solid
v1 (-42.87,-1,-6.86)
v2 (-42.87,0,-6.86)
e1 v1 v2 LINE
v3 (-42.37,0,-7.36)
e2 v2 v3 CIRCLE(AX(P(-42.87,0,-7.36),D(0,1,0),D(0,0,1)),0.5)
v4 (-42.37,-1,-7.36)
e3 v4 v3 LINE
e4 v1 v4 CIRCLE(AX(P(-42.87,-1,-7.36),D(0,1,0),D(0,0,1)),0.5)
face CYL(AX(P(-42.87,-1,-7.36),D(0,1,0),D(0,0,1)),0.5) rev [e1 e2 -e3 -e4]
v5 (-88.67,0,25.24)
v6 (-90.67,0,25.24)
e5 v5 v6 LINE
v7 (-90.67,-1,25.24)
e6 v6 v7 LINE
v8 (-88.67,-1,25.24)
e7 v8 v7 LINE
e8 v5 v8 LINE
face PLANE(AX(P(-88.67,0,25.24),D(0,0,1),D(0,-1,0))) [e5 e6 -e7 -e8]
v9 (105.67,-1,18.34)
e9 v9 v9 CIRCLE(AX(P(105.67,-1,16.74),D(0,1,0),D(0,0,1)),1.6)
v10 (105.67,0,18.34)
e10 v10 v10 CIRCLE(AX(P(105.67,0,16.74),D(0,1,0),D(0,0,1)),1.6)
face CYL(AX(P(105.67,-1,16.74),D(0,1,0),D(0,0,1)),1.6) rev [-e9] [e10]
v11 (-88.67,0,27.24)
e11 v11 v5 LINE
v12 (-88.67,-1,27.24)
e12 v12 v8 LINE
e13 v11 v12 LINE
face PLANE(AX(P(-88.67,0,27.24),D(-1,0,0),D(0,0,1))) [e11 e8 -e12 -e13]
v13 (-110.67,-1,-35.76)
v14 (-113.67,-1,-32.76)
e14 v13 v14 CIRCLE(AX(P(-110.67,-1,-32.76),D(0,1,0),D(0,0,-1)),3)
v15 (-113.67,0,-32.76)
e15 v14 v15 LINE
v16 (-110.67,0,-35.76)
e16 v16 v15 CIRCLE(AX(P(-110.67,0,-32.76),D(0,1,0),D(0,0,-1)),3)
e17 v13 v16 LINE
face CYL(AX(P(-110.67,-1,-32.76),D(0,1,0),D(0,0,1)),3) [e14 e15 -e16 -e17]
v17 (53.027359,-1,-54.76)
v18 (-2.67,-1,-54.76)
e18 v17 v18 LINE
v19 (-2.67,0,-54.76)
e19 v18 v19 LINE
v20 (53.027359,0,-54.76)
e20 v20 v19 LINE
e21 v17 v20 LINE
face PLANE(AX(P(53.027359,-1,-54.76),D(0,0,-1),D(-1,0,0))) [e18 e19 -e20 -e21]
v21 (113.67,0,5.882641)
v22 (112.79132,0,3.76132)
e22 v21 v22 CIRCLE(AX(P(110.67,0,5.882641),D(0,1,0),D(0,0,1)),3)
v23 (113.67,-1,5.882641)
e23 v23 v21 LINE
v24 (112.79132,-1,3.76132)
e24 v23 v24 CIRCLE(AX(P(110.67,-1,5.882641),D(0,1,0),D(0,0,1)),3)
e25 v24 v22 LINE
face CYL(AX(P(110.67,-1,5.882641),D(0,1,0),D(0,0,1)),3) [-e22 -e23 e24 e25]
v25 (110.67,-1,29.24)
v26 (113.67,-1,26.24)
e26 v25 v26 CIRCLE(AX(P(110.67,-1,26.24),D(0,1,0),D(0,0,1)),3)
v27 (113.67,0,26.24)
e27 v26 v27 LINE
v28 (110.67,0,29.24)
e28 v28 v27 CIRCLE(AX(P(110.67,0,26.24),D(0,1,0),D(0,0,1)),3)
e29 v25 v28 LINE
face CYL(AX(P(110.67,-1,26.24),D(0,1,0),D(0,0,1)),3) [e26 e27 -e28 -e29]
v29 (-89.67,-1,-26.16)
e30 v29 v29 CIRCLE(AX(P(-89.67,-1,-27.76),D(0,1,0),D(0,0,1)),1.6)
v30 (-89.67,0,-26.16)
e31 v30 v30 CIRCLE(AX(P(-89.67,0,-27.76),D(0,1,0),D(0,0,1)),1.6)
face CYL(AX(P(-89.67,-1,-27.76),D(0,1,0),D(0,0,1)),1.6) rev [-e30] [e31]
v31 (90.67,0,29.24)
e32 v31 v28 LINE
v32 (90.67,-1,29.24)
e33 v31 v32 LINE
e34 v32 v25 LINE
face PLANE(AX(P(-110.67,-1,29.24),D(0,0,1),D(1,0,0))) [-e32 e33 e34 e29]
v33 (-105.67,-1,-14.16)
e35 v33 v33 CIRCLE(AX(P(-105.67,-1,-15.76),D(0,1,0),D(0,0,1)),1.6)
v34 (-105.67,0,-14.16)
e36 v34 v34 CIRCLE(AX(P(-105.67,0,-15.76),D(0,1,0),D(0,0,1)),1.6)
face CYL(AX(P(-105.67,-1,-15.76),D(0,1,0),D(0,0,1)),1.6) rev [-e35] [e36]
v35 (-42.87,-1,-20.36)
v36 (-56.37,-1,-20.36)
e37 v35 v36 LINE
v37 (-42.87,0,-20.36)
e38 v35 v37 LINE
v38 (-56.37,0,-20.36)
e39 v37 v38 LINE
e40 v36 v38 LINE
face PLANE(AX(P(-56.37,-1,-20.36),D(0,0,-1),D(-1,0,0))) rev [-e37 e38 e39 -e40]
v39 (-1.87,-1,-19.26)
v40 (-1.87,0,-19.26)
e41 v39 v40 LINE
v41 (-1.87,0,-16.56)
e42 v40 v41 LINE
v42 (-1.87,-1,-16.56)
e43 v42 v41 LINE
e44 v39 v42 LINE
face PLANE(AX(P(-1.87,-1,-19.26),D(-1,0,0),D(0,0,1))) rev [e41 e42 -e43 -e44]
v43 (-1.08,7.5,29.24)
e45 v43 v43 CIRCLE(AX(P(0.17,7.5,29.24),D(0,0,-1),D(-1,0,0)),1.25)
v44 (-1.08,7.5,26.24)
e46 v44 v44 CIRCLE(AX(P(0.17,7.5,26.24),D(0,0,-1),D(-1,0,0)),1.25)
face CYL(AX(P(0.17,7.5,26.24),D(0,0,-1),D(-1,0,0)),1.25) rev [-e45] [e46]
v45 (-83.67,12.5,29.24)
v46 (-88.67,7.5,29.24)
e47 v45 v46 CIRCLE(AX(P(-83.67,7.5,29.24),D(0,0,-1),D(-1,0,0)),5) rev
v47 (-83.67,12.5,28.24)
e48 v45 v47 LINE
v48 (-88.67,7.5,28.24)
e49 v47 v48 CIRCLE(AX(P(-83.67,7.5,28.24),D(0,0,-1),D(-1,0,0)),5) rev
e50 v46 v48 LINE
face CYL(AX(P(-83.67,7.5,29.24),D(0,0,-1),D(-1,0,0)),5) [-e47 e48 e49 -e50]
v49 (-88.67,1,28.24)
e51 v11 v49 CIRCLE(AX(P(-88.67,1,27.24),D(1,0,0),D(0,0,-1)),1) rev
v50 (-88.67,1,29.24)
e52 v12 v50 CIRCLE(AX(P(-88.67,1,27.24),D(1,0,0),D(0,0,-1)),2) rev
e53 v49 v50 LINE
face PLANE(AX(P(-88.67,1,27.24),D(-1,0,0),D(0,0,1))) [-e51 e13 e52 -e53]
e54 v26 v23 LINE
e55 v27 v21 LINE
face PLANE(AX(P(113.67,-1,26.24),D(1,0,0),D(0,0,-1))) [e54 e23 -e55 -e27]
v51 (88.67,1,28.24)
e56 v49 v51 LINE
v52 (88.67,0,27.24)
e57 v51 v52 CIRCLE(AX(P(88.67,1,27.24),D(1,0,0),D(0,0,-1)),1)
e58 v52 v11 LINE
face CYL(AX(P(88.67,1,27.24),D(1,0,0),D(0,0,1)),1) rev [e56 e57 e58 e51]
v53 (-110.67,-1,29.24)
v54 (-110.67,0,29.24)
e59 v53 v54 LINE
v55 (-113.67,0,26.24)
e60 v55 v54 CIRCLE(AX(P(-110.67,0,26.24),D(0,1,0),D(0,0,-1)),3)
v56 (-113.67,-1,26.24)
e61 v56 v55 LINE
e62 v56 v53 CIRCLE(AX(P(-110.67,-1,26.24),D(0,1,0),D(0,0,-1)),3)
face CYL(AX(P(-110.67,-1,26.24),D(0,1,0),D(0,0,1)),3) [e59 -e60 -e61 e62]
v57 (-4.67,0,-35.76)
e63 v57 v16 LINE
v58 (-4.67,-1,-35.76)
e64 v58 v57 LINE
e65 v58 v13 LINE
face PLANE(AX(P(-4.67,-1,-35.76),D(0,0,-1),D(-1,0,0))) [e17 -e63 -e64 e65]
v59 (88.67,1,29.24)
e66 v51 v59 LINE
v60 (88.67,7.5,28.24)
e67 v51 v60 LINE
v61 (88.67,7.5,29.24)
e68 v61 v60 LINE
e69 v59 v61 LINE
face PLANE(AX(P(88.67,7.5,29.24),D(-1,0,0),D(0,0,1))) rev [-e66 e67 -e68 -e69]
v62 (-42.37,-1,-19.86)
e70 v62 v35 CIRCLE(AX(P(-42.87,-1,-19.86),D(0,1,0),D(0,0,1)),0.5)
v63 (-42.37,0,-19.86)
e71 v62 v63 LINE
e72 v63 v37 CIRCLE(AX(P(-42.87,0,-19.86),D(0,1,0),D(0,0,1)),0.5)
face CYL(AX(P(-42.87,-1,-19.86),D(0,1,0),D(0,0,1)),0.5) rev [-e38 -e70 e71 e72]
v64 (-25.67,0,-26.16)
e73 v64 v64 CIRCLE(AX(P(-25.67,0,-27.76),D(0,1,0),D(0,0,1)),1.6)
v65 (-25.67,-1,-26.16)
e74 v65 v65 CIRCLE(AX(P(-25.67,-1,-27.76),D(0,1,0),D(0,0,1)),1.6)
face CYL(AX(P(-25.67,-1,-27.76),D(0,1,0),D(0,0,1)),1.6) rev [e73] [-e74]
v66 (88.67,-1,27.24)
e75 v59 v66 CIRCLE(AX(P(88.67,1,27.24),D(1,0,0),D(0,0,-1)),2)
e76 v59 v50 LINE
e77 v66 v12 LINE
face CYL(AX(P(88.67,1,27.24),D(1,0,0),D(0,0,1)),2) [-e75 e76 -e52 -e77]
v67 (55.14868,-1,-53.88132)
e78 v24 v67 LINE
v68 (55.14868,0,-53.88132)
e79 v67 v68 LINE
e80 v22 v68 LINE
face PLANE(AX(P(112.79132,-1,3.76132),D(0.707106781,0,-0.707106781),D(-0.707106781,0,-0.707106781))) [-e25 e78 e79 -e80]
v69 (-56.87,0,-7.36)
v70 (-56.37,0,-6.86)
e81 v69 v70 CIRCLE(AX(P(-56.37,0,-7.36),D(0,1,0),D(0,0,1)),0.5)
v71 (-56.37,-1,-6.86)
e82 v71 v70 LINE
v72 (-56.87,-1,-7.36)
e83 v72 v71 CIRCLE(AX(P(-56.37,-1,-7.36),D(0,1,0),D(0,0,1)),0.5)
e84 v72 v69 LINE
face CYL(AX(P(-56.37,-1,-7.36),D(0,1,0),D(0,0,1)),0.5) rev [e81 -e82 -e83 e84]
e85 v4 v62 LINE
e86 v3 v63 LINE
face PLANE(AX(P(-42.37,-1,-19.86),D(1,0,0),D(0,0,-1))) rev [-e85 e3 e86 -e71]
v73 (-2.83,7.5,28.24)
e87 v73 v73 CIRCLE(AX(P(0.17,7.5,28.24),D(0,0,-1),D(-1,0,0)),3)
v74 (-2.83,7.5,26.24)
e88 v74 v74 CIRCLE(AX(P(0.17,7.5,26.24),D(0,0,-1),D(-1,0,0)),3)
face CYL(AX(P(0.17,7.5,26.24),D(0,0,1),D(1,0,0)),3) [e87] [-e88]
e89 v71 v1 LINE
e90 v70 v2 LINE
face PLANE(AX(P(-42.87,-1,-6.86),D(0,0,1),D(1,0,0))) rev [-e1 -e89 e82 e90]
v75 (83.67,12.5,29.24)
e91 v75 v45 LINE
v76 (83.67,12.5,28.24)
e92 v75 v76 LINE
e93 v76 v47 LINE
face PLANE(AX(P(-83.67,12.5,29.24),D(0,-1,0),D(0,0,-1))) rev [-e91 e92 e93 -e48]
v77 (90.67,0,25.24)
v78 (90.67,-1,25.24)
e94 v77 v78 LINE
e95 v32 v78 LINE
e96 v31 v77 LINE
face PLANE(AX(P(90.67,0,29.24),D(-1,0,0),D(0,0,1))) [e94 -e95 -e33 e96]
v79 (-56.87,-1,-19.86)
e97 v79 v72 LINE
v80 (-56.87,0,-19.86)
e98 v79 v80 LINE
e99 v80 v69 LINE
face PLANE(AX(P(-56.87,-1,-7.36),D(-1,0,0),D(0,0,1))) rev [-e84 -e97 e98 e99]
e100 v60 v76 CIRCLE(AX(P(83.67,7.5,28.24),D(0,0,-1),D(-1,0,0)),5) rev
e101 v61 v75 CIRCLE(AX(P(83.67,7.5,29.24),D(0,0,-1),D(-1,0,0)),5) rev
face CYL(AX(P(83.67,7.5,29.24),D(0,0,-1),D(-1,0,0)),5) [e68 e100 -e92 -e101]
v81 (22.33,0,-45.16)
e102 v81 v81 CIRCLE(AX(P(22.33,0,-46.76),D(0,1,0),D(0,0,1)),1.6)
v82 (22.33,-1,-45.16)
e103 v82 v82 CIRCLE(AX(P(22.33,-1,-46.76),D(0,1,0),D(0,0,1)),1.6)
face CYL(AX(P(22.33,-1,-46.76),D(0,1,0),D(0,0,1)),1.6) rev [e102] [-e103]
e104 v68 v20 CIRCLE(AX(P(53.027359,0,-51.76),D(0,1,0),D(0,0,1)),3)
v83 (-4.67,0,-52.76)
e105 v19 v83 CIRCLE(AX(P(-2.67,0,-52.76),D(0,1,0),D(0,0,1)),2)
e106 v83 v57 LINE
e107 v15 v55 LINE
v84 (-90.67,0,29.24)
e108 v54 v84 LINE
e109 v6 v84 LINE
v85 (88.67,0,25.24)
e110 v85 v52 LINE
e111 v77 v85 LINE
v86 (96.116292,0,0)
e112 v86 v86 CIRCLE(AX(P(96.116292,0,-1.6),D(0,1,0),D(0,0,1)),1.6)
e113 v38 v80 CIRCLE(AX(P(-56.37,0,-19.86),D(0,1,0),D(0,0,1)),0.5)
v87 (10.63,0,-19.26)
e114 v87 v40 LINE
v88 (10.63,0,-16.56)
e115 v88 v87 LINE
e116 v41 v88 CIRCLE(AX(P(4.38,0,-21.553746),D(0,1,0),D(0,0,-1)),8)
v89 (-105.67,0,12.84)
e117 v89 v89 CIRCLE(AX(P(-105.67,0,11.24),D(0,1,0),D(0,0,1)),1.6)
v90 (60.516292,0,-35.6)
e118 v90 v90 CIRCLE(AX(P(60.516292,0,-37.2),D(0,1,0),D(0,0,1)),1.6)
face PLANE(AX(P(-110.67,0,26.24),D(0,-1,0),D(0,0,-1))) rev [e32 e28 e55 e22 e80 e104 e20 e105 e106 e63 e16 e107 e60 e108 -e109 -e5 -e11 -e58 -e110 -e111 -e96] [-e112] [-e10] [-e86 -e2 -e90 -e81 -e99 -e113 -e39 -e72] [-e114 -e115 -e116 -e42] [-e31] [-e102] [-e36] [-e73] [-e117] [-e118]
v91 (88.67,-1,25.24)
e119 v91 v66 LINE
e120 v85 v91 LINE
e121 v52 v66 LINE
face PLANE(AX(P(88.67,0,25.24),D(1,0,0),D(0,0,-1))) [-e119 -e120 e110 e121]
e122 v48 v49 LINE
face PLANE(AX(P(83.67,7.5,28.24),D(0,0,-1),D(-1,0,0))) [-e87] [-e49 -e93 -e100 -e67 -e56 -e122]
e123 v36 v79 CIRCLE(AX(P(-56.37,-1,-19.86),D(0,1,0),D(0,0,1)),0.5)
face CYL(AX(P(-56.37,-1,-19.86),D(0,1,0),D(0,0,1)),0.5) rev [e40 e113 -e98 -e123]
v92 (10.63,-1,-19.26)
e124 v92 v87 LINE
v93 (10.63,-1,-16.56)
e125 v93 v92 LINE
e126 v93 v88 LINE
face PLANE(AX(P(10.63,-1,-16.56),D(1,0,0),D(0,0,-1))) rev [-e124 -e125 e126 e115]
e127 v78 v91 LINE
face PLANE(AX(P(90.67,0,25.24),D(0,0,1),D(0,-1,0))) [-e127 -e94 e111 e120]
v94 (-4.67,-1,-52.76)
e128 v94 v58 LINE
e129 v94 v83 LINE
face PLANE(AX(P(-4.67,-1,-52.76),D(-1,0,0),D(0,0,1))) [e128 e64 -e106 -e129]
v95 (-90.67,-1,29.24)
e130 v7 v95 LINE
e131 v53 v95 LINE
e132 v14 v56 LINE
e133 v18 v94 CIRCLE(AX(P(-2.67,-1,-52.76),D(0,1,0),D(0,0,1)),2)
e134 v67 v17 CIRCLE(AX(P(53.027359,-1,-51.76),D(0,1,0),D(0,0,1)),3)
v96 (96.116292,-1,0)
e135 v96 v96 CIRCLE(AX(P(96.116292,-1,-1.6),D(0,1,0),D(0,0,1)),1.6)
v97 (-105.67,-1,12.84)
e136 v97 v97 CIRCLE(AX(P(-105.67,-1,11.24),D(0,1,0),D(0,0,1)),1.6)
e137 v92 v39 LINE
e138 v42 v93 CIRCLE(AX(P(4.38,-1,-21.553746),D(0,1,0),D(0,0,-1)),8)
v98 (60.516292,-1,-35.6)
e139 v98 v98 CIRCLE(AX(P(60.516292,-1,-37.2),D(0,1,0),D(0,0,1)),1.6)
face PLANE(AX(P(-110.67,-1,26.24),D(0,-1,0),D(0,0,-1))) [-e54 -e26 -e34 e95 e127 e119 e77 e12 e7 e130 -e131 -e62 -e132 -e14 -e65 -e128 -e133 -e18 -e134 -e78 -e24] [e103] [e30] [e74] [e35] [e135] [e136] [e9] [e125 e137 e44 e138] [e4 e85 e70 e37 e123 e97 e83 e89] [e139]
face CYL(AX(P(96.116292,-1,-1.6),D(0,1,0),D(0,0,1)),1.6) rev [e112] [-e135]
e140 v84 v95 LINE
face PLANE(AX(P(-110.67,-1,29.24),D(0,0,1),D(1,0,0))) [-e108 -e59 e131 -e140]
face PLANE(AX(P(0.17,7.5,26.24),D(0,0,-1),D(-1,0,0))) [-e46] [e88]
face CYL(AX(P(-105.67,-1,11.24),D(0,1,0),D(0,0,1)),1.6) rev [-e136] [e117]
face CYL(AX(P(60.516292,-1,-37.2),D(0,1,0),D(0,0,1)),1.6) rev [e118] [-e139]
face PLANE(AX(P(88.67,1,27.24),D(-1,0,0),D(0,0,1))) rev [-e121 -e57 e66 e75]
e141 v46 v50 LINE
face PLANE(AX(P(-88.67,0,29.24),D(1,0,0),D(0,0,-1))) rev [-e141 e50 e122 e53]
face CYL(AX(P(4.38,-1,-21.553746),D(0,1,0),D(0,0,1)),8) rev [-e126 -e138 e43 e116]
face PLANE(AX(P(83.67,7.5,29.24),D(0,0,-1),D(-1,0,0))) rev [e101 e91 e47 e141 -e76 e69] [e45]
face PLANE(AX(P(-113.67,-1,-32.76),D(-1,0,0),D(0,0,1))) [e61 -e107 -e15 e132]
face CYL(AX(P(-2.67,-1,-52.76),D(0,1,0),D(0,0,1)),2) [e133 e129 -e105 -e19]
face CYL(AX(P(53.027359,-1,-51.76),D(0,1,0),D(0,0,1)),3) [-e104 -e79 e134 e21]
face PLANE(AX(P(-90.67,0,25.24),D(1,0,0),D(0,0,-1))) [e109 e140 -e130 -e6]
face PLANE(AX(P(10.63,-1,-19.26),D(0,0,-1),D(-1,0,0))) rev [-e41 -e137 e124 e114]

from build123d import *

# Parameters (mm, degrees)
SKETCH_1_R                        = 1.6
SM_BASE_FLANGE_1_DEPTH            = 1
SM_EDGE_FLANGE_1_STRIP_W          = 6
SM_EDGE_FLANGE_1_STRIP_H          = 1
SM_EDGE_FLANGE_1_STRIP_CUT_DEPTH  = 177.34
SM_EDGE_FLANGE_1_RELIEF_W         = 8
SM_EDGE_FLANGE_1_RELIEF_H         = 2
SM_EDGE_FLANGE_1_RELIEF_CUT_DEPTH = 1
SM_EDGE_FLANGE_1_DEPTH            = 177.34
SM_EDGE_FLANGE_1_FLAT_DEPTH       = 1
SKETCH_5_R                        = 3
EXTRUDE_1_DEPTH                   = 2
HOLE_WIZARD_M3_1_D                = 2.5


# Sheet-metal steps are written as plain solids
with BuildPart() as part:
    # Sketch 1 → 基体-法兰1 (new body)
    with BuildSketch(Plane(origin=(0, 0, 0), x_dir=(1, 0, 0), z_dir=(0, 1, 0))):
        with BuildLine():
            Line((-113.67, 32.76), (-113.67, -26.24))
            ThreePointArc((-113.67, -26.24), (-112.791320344, -28.361320344), (-110.67, -29.24))
            Line((-110.67, -29.24), (110.67, -29.24))
            ThreePointArc((110.67, -29.24), (112.791320344, -28.361320344), (113.67, -26.24))
            Line((113.67, -26.24), (113.67, -5.882640687))
            ThreePointArc((113.67, -5.882640687), (113.441638598, -4.73459039), (112.791320344, -3.761320344))
            Line((112.791320344, -3.761320344), (55.148679656, 53.881320344))
            ThreePointArc((55.148679656, 53.881320344), (54.17540961, 54.531638598), (53.027359313, 54.76))
            Line((53.027359313, 54.76), (-2.67, 54.76))
            ThreePointArc((-2.67, 54.76), (-4.084213562, 54.174213562), (-4.67, 52.76))
            Line((-4.67, 52.76), (-4.67, 35.76))
            Line((-4.67, 35.76), (-110.67, 35.76))
            ThreePointArc((-110.67, 35.76), (-112.791320344, 34.881320344), (-113.67, 32.76))
        make_face()
        with Locations(Location((-105.67, -11.24, 0), (0, 0, 270))):
            Circle(SKETCH_1_R, mode=Mode.SUBTRACT)
        with Locations(Location((-105.67, 15.76, 0), (0, 0, 270))):
            Circle(SKETCH_1_R, mode=Mode.SUBTRACT)
        with Locations(Location((-89.67, 27.76, 0), (0, 0, 270))):
            Circle(SKETCH_1_R, mode=Mode.SUBTRACT)
        with Locations(Location((-25.67, 27.76, 0), (0, 0, 270))):
            Circle(SKETCH_1_R, mode=Mode.SUBTRACT)
        with Locations(Location((22.33, 46.76, 0), (0, 0, 270))):
            Circle(SKETCH_1_R, mode=Mode.SUBTRACT)
        with Locations(Location((60.516291501, 37.2, 0), (0, 0, 270))):
            Circle(SKETCH_1_R, mode=Mode.SUBTRACT)
        with Locations(Location((96.116291501, 1.6, 0), (0, 0, 270))):
            Circle(SKETCH_1_R, mode=Mode.SUBTRACT)
        with Locations(Location((105.67, -16.74, 0), (0, 0, 270))):
            Circle(SKETCH_1_R, mode=Mode.SUBTRACT)
        with BuildLine():
            Line((10.63, 19.26), (-1.87, 19.26))
            Line((-1.87, 19.26), (-1.87, 16.56))
            ThreePointArc((-1.87, 16.56), (4.38, 13.553746089), (10.63, 16.56))
            Line((10.63, 16.56), (10.63, 19.26))
        make_face(mode=Mode.SUBTRACT)
        with BuildLine():
            Line((-42.37, 19.86), (-42.37, 7.36))
            ThreePointArc((-42.37, 7.36), (-42.516446609, 7.006446609), (-42.87, 6.86))
            Line((-42.87, 6.86), (-56.37, 6.86))
            ThreePointArc((-56.37, 6.86), (-56.723553391, 7.006446609), (-56.87, 7.36))
            Line((-56.87, 7.36), (-56.87, 19.86))
            ThreePointArc((-56.87, 19.86), (-56.723553391, 20.213553391), (-56.37, 20.36))
            Line((-56.37, 20.36), (-42.87, 20.36))
            ThreePointArc((-42.87, 20.36), (-42.516446609, 20.213553391), (-42.37, 19.86))
        make_face(mode=Mode.SUBTRACT)
    extrude(amount=-SM_BASE_FLANGE_1_DEPTH)

    # 边线-法兰1 strip (across the edge) → 边线-法兰1 strip cut (cut)
    with BuildSketch(Plane(origin=(-88.67, 0, 29.24), x_dir=(0, 0, -1), z_dir=(1, 0, 0))):
        with Locations((-1, -0.5)):
            Rectangle(SM_EDGE_FLANGE_1_STRIP_W, SM_EDGE_FLANGE_1_STRIP_H)
    extrude(amount=SM_EDGE_FLANGE_1_STRIP_CUT_DEPTH, mode=Mode.SUBTRACT)

    # 边线-法兰1 relief (on the sheet) → 边线-法兰1 relief cut (cut)
    with BuildSketch(Plane(origin=(-88.67, 0, 27.24), x_dir=(0, 0, -1), z_dir=(0, 1, 0))):
        with Locations((-2, 1)):
            Rectangle(SM_EDGE_FLANGE_1_RELIEF_W, SM_EDGE_FLANGE_1_RELIEF_H)
        with Locations((-2, -178.34)):
            Rectangle(SM_EDGE_FLANGE_1_RELIEF_W, SM_EDGE_FLANGE_1_RELIEF_H)
    extrude(amount=-SM_EDGE_FLANGE_1_RELIEF_CUT_DEPTH, mode=Mode.SUBTRACT)

    # 边线-法兰1 bend section (across the edge) → 边线-法兰1 (add)
    with BuildSketch(Plane(origin=(-88.67, 0, 29.24), x_dir=(0, 0, -1), z_dir=(1, 0, 0))):
        with BuildLine():
            Line((0, 1), (1, 1))
            ThreePointArc((1, 1), (1.292893219, 0.292893219), (2, 0))
            Line((2, 0), (2, -1))
            ThreePointArc((2, -1), (0.585786438, -0.414213562), (0, 1))
        make_face()
    extrude(amount=SM_EDGE_FLANGE_1_DEPTH)

    # 边线-法兰1 profile (on flange) → 边线-法兰1 flat (add)
    with BuildSketch(Plane.XY.offset(29.24)):
        with BuildLine():
            Line((-88.67, 1), (88.67, 1))
            Line((88.67, 1), (88.67, 7.5))
            ThreePointArc((88.67, 7.5), (87.205533906, 11.035533906), (83.67, 12.5))
            Line((83.67, 12.5), (-83.67, 12.5))
            ThreePointArc((-83.67, 12.5), (-87.205533906, 11.035533906), (-88.67, 7.5))
            Line((-88.67, 7.5), (-88.67, 1))
        make_face()
    extrude(amount=-SM_EDGE_FLANGE_1_FLAT_DEPTH)

    # 草图5 → 凸台-拉伸1 (add)
    with BuildSketch(Plane(origin=(0, 0, 28.24), x_dir=(-1, 0, 0), z_dir=(0, 0, -1))):
        with Locations((-0.17, 7.5)):
            Circle(SKETCH_5_R)
    extrude(amount=EXTRUDE_1_DEPTH)

    # M3 螺纹孔1 (through all)
    with Locations(Plane(origin=(0, 0, 26.24), x_dir=(-1, 0, 0), z_dir=(0, 0, -1))):
        with Locations((-0.17, 7.5)):
            Hole(HOLE_WIZARD_M3_1_D / 2)


solid = part.part
